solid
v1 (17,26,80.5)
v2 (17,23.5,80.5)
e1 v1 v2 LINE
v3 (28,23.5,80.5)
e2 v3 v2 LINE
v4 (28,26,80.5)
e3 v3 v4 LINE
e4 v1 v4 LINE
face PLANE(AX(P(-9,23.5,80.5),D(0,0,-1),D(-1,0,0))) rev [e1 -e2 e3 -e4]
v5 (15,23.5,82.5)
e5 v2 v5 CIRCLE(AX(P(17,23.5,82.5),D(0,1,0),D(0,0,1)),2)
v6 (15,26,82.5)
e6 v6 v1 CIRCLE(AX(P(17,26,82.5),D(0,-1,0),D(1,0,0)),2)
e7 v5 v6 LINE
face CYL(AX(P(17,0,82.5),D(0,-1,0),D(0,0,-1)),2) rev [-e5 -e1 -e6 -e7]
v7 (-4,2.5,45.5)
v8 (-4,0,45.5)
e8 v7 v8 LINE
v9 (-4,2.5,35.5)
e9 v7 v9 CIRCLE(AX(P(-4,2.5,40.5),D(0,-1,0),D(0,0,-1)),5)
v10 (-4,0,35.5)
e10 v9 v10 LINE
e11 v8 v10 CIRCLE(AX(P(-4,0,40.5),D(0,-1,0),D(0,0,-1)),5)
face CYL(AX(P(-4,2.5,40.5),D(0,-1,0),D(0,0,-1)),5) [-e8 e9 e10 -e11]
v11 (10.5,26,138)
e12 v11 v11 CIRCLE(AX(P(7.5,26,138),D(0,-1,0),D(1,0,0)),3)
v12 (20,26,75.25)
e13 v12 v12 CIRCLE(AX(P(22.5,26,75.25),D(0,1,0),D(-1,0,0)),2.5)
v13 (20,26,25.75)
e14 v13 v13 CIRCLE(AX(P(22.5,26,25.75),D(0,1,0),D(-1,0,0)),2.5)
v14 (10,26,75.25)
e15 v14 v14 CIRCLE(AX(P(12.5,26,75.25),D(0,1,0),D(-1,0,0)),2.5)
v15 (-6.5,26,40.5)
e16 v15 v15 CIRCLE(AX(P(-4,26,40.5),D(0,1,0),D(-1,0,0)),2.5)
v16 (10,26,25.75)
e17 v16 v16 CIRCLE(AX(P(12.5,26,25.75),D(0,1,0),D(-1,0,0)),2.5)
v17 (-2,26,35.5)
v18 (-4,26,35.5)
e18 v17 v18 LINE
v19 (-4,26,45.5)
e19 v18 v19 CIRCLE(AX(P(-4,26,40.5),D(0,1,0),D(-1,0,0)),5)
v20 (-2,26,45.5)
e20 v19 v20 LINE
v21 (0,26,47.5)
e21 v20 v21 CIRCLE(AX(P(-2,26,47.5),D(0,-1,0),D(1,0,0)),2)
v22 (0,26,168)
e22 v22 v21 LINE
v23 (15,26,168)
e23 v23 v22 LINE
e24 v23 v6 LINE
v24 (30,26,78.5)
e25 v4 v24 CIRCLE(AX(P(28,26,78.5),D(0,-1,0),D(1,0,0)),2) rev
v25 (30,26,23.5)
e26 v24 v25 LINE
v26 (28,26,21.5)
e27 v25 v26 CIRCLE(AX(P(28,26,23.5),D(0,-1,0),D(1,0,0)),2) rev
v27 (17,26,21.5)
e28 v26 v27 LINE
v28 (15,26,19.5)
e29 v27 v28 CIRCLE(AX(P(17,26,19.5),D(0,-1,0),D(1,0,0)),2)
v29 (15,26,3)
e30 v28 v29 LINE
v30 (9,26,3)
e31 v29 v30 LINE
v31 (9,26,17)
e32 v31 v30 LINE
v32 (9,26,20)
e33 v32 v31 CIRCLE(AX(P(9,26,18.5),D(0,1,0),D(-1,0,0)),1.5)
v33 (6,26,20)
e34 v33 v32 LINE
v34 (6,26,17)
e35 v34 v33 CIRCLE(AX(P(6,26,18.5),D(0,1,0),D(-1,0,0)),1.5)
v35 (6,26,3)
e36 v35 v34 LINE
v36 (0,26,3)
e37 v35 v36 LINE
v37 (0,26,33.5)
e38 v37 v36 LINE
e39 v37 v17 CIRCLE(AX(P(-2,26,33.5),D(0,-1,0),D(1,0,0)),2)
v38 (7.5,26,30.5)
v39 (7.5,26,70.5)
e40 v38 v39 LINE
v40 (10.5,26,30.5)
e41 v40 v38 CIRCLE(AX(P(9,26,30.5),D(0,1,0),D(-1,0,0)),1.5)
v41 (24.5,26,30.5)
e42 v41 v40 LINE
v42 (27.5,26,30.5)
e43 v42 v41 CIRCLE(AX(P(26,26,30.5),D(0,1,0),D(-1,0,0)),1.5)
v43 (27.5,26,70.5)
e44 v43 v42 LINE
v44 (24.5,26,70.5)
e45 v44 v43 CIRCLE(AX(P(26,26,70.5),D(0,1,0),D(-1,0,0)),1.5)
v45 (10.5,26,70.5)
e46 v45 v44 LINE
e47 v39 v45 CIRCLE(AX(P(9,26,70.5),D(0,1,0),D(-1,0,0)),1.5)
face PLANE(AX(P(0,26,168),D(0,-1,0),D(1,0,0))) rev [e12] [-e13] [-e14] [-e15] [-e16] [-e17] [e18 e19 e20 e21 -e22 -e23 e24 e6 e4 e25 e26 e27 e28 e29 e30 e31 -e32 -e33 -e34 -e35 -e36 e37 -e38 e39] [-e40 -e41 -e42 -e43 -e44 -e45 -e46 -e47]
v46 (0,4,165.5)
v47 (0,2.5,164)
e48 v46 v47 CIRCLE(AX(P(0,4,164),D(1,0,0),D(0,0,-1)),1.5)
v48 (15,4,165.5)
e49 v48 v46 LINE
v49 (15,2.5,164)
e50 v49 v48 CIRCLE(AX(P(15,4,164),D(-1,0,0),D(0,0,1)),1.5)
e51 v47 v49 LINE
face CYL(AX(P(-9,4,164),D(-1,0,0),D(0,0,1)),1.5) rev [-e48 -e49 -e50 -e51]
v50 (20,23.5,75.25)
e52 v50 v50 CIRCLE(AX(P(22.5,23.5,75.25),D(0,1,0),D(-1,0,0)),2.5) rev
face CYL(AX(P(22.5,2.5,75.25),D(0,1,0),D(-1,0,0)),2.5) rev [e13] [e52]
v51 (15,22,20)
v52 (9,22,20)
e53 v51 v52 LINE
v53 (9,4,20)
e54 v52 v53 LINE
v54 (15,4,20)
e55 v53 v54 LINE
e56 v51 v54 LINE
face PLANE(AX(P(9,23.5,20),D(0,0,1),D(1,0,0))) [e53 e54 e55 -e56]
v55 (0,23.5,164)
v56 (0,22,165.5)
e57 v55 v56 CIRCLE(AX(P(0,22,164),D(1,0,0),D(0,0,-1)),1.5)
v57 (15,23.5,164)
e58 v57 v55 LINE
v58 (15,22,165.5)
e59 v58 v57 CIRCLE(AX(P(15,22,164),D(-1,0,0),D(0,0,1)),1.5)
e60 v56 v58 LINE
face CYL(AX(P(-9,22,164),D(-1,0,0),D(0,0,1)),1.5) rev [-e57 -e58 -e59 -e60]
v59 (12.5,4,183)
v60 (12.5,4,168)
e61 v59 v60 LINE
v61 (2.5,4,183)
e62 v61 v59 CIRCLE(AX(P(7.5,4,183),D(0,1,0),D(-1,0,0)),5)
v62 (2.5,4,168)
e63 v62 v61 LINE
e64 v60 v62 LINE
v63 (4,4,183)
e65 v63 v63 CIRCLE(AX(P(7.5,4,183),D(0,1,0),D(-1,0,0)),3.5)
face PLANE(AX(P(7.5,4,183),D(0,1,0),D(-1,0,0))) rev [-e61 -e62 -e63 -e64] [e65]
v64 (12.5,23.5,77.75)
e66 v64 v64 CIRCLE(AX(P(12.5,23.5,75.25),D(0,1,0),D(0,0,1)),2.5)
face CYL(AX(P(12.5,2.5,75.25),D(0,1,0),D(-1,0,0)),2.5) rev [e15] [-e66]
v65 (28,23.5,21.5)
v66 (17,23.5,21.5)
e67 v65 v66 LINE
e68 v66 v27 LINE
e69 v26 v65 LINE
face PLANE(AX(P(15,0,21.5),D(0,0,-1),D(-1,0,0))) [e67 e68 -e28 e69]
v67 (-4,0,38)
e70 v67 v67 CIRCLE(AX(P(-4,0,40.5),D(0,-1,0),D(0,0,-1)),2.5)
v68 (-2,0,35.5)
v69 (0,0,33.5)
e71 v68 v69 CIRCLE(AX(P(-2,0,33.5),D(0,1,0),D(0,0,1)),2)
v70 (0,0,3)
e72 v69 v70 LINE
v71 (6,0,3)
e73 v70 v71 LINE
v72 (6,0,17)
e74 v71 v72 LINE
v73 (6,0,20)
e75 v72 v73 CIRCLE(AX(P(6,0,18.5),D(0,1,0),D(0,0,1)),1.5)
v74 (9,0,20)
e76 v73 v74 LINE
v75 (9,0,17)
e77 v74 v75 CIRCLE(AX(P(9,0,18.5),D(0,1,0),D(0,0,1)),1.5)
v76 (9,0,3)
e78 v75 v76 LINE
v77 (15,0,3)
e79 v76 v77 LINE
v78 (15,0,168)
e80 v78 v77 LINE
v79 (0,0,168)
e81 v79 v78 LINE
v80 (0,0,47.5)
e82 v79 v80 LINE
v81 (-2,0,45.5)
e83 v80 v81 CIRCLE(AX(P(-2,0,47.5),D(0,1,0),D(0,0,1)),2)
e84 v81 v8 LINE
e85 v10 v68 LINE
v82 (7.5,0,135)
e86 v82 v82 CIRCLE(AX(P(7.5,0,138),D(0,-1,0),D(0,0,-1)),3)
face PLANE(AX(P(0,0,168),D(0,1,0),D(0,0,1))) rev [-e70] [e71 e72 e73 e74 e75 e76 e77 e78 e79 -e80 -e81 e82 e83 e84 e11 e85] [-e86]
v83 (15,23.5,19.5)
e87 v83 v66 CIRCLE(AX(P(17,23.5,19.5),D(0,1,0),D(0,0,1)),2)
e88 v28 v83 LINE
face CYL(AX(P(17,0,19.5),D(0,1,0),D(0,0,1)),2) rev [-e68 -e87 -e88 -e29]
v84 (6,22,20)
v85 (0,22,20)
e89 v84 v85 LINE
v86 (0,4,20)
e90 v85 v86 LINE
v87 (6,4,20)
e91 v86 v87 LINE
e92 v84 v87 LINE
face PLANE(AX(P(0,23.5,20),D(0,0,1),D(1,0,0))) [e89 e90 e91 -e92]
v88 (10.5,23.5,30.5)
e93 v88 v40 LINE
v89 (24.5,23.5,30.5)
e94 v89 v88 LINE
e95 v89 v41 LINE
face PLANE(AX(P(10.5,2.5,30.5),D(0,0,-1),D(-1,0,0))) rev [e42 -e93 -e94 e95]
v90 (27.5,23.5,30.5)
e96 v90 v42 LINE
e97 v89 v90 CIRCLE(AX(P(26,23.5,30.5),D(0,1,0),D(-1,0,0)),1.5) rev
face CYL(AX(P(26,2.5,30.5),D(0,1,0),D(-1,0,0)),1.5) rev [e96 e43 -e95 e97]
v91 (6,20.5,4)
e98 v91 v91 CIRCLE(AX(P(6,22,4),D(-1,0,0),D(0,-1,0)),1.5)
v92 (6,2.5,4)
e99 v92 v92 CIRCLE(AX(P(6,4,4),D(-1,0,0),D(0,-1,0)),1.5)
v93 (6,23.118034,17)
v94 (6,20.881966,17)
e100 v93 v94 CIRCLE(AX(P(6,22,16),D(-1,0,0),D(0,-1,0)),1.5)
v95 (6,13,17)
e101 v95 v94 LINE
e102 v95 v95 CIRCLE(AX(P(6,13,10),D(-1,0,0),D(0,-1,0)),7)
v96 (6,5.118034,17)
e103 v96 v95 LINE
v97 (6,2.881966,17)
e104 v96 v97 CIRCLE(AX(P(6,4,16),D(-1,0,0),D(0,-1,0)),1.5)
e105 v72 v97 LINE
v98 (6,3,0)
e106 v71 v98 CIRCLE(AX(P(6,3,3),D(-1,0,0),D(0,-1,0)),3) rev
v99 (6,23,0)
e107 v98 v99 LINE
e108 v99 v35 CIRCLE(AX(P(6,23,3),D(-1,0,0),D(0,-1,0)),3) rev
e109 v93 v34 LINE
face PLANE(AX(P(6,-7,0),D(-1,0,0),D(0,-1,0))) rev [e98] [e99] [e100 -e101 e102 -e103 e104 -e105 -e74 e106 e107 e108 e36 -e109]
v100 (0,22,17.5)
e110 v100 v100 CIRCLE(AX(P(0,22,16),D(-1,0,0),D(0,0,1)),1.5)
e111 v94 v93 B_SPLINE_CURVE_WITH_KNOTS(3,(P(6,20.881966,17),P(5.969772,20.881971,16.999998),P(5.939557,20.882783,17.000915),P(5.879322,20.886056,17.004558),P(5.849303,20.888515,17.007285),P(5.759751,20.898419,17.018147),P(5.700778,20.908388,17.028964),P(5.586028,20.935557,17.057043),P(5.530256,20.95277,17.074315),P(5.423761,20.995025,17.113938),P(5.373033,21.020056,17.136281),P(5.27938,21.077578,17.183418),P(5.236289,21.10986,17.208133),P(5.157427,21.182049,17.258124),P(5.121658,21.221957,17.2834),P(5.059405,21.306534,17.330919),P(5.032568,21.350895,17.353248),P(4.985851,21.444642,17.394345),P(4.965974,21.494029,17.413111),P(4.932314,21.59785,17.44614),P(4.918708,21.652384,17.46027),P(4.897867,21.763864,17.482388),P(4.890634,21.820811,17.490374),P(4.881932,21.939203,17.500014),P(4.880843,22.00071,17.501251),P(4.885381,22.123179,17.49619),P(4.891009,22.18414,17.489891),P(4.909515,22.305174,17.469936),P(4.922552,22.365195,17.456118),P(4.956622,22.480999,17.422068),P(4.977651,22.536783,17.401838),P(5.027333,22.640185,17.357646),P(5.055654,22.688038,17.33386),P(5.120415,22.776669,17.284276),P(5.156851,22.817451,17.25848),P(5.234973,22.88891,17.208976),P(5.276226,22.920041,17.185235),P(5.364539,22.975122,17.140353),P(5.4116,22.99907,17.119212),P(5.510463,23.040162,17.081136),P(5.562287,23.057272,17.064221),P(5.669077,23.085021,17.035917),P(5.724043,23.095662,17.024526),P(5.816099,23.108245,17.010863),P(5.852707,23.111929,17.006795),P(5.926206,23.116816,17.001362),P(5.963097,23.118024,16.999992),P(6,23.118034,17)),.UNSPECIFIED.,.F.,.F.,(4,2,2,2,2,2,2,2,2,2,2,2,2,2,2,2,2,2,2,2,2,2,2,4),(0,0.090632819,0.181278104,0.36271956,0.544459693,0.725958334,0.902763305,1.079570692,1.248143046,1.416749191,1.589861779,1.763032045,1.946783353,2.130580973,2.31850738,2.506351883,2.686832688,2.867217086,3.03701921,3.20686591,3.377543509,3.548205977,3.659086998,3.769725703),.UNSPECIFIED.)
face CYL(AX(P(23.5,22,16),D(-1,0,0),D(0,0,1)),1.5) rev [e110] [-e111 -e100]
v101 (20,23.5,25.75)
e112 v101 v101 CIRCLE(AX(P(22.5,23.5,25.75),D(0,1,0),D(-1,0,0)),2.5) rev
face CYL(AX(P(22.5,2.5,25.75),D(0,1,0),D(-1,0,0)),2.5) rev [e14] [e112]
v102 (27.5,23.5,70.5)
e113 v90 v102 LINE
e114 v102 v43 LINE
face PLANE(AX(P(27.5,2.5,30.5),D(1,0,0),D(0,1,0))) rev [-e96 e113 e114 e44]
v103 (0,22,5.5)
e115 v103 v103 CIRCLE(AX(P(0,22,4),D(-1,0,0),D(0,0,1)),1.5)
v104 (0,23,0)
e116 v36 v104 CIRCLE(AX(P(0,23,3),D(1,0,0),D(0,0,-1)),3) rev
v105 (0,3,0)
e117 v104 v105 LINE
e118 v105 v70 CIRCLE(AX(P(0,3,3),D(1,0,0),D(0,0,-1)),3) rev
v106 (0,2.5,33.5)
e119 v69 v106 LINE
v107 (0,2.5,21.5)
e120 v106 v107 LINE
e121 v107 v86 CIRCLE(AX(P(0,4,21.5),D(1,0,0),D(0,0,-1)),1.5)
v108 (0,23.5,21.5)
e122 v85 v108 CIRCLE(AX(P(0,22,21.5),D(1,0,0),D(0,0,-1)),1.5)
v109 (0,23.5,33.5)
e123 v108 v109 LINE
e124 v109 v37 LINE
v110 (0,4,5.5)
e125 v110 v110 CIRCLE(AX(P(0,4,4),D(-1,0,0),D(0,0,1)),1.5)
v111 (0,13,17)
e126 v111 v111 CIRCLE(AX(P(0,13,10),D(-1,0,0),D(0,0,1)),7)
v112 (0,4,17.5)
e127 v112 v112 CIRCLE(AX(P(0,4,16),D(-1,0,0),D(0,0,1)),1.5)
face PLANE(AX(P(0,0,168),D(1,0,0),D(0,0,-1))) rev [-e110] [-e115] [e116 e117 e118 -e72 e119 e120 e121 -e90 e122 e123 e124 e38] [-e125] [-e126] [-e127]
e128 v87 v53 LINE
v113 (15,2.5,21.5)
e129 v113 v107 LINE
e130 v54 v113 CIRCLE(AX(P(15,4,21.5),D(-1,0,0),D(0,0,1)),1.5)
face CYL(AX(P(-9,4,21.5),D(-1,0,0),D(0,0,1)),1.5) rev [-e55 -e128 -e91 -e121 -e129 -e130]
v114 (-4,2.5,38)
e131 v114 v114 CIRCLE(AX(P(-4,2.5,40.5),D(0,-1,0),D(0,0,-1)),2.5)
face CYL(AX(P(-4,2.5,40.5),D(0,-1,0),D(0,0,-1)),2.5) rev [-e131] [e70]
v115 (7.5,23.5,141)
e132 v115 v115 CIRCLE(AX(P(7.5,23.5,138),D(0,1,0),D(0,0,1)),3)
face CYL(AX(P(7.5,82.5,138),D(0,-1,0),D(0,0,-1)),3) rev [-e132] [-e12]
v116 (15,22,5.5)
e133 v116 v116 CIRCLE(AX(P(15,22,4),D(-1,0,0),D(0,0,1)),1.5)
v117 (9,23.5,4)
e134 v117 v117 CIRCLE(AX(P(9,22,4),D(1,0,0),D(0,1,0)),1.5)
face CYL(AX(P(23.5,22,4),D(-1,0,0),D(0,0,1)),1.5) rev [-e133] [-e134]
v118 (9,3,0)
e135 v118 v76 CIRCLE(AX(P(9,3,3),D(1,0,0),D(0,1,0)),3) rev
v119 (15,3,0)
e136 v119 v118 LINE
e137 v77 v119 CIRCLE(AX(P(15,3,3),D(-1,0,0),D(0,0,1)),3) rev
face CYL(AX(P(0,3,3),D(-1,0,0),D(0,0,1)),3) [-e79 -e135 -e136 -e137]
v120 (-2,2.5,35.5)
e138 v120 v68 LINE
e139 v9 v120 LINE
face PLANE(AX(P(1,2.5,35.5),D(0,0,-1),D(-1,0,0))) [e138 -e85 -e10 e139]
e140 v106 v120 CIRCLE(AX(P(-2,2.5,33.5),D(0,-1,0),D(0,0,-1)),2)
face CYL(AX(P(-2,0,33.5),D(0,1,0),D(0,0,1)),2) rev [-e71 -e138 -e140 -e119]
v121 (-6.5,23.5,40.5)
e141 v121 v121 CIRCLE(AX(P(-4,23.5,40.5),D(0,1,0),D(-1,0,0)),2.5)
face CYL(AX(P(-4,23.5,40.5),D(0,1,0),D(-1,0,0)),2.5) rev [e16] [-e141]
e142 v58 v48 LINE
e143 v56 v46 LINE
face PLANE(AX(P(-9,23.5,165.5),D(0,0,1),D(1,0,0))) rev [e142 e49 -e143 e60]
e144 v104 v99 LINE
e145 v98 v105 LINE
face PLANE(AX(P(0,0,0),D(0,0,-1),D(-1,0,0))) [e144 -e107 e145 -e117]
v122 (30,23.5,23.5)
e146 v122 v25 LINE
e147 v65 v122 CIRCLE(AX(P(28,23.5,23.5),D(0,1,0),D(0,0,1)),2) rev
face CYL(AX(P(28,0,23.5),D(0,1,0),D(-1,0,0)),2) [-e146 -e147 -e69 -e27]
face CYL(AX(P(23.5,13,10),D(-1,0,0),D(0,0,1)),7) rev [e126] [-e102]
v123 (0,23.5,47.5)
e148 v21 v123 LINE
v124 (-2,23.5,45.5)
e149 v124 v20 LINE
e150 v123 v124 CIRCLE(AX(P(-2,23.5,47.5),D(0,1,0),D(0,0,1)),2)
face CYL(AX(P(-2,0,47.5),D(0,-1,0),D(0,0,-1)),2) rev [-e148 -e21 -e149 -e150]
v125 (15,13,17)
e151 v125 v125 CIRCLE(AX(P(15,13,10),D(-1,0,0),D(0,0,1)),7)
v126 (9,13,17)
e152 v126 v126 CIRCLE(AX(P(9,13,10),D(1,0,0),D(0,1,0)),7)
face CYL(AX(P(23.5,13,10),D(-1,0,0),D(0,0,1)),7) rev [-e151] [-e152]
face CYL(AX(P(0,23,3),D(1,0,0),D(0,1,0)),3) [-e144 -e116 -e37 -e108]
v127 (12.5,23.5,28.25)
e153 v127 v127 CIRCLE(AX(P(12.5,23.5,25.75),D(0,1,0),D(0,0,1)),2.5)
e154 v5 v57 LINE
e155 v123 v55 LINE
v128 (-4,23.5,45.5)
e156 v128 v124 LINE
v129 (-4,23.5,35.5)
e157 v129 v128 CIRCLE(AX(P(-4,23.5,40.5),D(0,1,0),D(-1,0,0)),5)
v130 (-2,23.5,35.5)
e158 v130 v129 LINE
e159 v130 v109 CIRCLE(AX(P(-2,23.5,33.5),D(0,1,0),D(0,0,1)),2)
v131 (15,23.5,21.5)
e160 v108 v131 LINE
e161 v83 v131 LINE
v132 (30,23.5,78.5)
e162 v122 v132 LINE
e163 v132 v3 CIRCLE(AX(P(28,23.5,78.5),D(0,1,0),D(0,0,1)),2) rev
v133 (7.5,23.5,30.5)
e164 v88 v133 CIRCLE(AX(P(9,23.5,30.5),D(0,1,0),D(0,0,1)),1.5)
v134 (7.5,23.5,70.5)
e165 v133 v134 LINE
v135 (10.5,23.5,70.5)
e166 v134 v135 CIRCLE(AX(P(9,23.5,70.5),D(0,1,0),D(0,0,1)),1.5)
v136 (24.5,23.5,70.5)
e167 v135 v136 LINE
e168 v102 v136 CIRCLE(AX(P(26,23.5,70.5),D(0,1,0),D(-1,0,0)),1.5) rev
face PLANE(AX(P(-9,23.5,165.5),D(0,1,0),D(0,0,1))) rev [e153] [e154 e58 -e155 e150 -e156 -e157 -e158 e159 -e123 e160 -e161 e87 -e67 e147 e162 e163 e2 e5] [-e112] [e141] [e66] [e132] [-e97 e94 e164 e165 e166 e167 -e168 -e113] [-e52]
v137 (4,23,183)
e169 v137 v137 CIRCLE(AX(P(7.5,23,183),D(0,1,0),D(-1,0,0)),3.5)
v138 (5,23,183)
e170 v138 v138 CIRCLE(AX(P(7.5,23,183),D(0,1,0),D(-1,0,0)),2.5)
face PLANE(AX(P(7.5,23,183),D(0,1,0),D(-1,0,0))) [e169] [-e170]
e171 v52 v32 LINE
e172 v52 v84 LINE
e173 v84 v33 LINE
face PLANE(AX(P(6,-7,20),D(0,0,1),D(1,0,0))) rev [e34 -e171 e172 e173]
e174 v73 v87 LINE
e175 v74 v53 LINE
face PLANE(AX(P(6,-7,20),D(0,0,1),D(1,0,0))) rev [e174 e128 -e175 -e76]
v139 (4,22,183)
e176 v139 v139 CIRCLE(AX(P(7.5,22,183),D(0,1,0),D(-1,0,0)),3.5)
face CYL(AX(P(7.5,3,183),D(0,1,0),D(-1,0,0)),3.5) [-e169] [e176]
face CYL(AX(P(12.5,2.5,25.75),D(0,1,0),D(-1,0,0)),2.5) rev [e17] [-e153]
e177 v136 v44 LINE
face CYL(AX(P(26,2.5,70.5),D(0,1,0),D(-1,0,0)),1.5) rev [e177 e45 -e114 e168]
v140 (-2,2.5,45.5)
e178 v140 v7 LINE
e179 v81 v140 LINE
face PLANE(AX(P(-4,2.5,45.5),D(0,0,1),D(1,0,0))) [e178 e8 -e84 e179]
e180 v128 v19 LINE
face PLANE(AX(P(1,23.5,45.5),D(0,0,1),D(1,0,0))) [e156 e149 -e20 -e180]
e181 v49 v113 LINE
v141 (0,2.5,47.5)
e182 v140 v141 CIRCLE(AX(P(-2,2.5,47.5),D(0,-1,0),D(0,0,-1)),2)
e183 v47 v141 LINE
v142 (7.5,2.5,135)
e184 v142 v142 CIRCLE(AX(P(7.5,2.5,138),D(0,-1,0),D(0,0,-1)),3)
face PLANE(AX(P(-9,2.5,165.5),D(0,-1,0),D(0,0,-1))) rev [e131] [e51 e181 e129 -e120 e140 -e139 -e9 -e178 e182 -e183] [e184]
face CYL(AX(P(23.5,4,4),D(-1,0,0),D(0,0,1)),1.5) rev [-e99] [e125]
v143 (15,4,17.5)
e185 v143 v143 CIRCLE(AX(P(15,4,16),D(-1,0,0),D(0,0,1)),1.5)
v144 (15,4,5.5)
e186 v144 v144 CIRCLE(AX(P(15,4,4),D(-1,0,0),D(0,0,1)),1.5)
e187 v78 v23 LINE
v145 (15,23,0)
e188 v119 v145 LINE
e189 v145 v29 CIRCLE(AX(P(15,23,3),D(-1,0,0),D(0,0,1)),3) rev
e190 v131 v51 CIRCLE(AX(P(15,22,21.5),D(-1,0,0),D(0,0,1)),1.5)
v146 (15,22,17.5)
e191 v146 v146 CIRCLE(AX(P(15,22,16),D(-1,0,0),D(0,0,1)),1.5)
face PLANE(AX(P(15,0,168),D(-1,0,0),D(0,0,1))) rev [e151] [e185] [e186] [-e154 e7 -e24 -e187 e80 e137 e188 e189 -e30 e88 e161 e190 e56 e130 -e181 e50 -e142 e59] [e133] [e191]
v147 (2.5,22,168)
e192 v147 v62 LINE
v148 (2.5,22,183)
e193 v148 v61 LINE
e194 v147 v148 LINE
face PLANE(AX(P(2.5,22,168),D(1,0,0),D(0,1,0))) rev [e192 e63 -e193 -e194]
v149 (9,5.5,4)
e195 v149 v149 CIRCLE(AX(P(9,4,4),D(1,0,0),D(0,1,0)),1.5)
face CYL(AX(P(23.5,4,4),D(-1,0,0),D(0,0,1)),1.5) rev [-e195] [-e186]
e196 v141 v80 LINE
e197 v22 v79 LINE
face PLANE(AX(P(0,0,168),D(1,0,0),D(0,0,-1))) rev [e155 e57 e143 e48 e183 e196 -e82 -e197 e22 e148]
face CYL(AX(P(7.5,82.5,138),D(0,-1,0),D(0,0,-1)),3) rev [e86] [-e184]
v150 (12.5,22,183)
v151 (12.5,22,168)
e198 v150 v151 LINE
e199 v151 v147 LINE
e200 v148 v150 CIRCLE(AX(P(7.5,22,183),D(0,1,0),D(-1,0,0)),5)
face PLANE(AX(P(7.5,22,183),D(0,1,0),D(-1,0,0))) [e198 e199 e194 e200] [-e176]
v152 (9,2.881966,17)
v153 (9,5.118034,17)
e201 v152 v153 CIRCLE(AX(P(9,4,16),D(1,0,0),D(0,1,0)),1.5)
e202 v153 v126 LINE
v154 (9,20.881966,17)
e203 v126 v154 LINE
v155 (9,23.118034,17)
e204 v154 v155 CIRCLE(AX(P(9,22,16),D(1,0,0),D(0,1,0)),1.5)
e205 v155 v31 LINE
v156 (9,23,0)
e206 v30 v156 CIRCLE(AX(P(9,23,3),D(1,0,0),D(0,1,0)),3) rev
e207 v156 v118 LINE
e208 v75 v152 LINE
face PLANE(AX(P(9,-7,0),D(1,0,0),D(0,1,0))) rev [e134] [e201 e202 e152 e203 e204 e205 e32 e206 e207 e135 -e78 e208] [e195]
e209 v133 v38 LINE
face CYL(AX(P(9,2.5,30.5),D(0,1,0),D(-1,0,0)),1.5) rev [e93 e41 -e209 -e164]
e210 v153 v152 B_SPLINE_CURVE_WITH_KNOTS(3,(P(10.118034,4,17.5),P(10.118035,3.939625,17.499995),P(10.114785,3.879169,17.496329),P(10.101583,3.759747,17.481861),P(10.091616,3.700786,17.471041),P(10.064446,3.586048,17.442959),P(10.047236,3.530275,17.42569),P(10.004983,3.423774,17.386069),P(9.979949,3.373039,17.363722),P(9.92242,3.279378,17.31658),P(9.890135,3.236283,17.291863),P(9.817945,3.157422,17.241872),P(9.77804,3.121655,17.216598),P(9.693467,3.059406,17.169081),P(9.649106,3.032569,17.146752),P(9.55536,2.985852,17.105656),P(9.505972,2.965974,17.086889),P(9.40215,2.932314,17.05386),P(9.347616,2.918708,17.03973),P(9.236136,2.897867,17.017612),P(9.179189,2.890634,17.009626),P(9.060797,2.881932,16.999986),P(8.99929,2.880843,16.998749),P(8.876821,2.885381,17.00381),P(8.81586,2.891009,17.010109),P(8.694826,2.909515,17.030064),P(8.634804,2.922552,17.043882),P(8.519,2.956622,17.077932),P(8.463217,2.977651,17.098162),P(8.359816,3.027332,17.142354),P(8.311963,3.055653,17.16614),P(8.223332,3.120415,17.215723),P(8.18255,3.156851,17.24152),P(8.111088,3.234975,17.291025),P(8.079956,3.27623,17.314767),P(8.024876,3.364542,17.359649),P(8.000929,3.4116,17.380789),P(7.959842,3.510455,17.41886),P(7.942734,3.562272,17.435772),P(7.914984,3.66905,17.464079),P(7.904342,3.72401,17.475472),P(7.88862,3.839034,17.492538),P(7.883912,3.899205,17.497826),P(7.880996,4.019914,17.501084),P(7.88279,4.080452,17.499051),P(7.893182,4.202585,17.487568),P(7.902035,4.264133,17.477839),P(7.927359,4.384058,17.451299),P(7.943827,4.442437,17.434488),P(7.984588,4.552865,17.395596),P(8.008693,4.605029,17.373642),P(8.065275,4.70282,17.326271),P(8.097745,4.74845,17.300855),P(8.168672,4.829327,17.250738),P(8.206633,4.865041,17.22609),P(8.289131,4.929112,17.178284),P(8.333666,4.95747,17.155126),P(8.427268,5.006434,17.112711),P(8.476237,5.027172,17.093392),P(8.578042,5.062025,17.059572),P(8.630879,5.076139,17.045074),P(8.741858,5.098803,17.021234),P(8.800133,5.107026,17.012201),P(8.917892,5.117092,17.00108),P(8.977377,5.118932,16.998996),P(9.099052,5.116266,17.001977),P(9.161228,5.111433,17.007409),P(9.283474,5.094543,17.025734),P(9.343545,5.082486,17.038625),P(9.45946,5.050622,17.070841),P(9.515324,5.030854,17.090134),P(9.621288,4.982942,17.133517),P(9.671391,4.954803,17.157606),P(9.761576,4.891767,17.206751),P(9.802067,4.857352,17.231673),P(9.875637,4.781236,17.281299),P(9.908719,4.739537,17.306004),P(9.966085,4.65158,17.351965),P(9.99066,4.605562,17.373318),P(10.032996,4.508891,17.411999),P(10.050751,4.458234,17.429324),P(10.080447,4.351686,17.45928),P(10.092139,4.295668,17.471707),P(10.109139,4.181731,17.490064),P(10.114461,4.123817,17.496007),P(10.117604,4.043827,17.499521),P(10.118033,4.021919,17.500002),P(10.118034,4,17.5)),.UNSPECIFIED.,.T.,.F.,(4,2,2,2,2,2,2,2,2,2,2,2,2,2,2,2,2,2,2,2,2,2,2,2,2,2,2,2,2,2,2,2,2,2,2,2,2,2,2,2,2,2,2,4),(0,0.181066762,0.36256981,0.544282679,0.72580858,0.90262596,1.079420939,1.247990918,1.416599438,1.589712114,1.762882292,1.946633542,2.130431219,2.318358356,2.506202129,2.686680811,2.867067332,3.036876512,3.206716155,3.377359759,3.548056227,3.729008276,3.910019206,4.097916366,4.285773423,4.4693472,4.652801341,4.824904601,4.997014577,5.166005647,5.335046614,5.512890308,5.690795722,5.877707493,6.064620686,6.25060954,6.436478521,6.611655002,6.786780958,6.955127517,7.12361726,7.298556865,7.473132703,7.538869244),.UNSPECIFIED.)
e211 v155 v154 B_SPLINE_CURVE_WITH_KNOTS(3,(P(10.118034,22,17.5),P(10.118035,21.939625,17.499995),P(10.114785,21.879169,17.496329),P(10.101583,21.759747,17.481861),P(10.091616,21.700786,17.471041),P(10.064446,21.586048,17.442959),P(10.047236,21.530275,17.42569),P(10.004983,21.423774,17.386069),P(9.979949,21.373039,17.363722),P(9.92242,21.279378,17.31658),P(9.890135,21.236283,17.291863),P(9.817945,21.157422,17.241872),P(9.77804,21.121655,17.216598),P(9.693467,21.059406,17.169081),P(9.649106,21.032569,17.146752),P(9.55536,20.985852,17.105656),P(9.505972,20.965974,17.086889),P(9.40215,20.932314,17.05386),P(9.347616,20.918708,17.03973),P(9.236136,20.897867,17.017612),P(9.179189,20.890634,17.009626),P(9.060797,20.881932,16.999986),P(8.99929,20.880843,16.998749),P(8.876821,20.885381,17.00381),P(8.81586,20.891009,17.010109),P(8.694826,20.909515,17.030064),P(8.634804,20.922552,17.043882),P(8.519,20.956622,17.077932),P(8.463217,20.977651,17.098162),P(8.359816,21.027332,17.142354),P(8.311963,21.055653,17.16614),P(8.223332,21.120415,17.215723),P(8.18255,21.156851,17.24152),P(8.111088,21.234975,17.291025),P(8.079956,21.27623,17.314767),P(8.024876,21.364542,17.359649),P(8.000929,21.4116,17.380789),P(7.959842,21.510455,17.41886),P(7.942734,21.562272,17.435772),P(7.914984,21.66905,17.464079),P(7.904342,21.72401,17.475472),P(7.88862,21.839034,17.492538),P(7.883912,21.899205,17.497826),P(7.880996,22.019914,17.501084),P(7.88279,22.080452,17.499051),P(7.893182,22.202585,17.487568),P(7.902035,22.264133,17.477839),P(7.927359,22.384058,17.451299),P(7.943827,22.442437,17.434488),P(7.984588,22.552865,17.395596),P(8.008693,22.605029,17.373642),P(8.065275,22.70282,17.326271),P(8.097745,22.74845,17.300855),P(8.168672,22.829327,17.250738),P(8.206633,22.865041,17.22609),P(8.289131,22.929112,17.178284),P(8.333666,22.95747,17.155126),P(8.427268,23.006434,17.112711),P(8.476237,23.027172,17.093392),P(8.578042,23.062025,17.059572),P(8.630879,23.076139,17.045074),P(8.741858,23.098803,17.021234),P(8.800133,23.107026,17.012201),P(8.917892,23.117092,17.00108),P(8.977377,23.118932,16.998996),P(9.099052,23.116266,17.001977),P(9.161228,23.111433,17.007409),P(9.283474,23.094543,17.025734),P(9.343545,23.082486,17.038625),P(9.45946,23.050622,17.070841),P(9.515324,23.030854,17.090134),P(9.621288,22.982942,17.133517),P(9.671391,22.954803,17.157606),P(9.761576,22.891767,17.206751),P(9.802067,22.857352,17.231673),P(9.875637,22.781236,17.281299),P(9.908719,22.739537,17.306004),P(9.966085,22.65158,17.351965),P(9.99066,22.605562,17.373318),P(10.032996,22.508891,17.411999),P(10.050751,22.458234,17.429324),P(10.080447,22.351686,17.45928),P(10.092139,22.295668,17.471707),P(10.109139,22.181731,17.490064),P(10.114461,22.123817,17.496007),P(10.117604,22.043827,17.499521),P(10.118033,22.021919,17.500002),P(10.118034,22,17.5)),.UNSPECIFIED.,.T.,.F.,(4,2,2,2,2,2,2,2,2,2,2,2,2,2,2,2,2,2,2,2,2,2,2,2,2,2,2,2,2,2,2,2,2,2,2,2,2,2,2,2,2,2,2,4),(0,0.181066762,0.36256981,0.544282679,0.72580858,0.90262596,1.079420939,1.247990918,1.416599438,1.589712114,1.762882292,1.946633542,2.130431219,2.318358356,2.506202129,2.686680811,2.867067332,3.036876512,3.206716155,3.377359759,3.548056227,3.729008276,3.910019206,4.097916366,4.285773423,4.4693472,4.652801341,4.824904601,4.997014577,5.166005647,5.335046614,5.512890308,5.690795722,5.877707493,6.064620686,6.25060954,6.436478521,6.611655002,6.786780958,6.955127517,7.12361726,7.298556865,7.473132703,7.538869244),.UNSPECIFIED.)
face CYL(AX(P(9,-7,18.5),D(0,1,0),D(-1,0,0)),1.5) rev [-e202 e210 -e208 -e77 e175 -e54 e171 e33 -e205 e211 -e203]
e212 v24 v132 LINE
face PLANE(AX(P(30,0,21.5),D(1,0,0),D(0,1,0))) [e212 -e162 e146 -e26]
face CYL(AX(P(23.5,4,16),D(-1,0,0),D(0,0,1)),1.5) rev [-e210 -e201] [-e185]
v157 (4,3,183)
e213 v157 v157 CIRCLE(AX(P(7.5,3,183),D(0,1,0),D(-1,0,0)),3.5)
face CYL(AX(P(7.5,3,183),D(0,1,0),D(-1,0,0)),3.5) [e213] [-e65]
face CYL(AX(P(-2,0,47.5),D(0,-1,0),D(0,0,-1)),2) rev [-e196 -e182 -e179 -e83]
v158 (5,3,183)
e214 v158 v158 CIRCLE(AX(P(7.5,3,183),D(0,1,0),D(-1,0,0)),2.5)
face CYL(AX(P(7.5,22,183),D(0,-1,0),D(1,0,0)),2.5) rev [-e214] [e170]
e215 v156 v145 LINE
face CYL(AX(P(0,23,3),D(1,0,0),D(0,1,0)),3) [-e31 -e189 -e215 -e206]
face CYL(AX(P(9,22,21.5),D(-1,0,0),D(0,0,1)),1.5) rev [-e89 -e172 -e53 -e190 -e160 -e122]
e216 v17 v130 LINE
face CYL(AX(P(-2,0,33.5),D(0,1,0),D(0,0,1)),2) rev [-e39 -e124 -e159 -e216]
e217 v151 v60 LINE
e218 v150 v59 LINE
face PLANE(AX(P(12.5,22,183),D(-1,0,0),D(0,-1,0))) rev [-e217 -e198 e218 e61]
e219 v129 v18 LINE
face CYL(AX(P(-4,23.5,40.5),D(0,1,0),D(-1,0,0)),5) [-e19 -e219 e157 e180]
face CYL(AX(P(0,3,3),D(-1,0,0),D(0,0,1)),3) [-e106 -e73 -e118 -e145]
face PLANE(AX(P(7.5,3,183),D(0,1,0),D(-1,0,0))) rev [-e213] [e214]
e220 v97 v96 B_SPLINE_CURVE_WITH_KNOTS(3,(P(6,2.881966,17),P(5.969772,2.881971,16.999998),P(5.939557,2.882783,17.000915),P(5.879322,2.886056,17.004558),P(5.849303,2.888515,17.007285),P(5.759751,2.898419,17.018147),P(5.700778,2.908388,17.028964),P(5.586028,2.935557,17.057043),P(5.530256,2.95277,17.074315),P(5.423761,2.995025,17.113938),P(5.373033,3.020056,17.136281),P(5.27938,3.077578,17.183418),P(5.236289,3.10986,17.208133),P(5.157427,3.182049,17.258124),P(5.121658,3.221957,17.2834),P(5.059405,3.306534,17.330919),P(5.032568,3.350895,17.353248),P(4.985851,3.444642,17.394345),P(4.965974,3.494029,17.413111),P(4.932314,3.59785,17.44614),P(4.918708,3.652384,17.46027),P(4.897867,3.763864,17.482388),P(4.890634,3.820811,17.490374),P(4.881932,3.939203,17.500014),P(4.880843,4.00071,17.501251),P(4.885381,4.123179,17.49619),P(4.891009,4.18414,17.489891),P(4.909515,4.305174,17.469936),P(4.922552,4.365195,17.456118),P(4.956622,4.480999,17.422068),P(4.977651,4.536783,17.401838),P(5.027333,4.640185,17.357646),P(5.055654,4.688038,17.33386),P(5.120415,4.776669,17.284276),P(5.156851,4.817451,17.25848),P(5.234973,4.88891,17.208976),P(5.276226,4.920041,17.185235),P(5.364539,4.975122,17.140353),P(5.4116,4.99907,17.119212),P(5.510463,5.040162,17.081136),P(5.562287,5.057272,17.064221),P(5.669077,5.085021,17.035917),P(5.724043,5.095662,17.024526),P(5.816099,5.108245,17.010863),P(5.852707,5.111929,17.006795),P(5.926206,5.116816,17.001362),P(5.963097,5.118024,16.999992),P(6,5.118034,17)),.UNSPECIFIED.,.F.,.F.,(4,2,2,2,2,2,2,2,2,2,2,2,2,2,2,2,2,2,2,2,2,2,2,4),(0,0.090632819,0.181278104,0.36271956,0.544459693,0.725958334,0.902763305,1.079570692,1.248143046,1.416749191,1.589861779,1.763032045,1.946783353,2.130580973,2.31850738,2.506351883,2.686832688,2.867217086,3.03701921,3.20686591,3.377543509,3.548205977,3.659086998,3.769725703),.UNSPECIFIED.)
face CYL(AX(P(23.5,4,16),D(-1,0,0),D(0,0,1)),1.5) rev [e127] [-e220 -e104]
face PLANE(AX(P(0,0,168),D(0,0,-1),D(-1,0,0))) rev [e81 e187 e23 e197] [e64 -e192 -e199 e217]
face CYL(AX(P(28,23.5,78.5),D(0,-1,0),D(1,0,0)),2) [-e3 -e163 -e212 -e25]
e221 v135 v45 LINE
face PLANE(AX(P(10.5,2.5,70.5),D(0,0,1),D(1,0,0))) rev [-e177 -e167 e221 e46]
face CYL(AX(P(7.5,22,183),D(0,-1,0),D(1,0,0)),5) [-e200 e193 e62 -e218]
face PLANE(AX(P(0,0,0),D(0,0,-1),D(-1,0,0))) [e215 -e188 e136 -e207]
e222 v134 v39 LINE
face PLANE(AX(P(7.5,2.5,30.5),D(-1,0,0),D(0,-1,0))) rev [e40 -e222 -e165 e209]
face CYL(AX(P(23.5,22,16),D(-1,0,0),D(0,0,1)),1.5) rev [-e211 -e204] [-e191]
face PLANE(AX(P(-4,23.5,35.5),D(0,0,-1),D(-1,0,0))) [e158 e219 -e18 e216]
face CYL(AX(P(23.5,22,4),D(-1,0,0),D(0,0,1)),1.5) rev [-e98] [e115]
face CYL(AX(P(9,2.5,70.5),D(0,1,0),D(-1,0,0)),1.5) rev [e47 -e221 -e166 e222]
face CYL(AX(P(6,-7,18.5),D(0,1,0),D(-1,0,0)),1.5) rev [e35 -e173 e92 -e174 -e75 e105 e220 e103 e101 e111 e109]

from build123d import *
from build123d.topology import SkipClean

# Parameters (mm, degrees)
SKETCH_1_W           = 15
SKETCH_1_H           = 26
EXTRUDE_1_DEPTH      = 168
SKETCH_2_R           = 2.5
EXTRUDE_2_DEPTH      = 9
EXTRUDE_3_DEPTH      = 1
EXTRUDE_3_DEPTH_BACK = 19
SKETCH_3_R           = 3.5
SKETCH_3_R_2         = 2.5
SKETCH_4_W           = 85
SKETCH_4_H           = 21
CUT_EXTRUDE_1_DEPTH  = 24
CUT_EXTRUDE_2_DEPTH  = 33
SKETCH_6_W           = 78
SKETCH_6_H           = 21
CUT_EXTRUDE_3_DEPTH  = 33
SKETCH_7_W           = 15
SKETCH_7_H           = 59
EXTRUDE_4_DEPTH      = 26
SKETCH_8_R           = 2.5
CUT_EXTRUDE_4_DEPTH  = 23.5
SKETCH_9_R           = 2.5
EXTRUDE_5_DEPTH      = 2.5
EXTRUDE_START        = -2.5
SKETCH_10_R          = 2.5
EXTRUDE_6_DEPTH      = 2.5
SKETCH_11_R          = 3
CUT_EXTRUDE_5_DEPTH  = 82.5
SKETCH_12_W          = 56.5
SKETCH_12_H          = 21
CUT_EXTRUDE_6_DEPTH  = 82.5
SKETCH_13_W          = 15
SKETCH_13_H          = 59
CUT_EXTRUDE_7_DEPTH  = 23.5
SKETCH_14_W          = 15
SKETCH_14_H          = 21
CUT_EXTRUDE_8_DEPTH  = 23.5
EXTRUDE_START_2      = -23.5
EXTRUDE_7_DEPTH      = 23.5
FILLET_1_R           = 2
SKETCH_16_R          = 1.5
SKETCH_16_R_2        = 7
CUT_EXTRUDE_9_DEPTH  = 23.5
FILLET_2_R           = 1.5
FILLET_3_R           = 3


with BuildPart() as part:
    # 草图1 → 凸台-拉伸1 (new body)
    with BuildSketch(Plane.XY):
        with Locations((7.5, 13)):
            Rectangle(SKETCH_1_W, SKETCH_1_H)
    extrude(amount=EXTRUDE_1_DEPTH)

    # 草图2 → 凸台-拉伸2 (add, symmetric)
    with BuildSketch(Plane(origin=(0, 13, 0), x_dir=(1, 0, 0), z_dir=(0, 1, 0))):
        with BuildLine():
            Line((12.5, -183), (12.5, -168))
            Line((12.5, -168), (2.5, -168))
            Line((2.5, -168), (2.5, -183))
            ThreePointArc((2.5, -183), (7.5, -188), (12.5, -183))
        make_face()
        with Locations(Location((7.5, -183, 0), (0, 0, 180))):
            Circle(SKETCH_2_R, mode=Mode.SUBTRACT)
    extrude(amount=EXTRUDE_2_DEPTH, both=True)

    # 草图3 → 凸台-拉伸3 (add, two sides: drawn at the far end of the back side and taken through both)
    with BuildSketch(Plane(origin=(0, 22, 0), x_dir=(1, 0, 0), z_dir=(0, 1, 0)).offset(-EXTRUDE_3_DEPTH_BACK)):
        with Locations(Location((7.5, -183, 0), (0, 0, 180))):
            Circle(SKETCH_3_R)
        with Locations(Location((7.5, -183, 0), (0, 0, 180))):
            Circle(SKETCH_3_R_2, mode=Mode.SUBTRACT)
    extrude(amount=EXTRUDE_3_DEPTH + EXTRUDE_3_DEPTH_BACK)

    # 草图4 → 切除-拉伸1 (cut)
    with BuildSketch(Plane(origin=(15, 0, 0), x_dir=(0, 0, -1), z_dir=(1, 0, 0))):
        with Locations((-123, 13)):
            Rectangle(SKETCH_4_W, SKETCH_4_H)
    extrude(amount=-CUT_EXTRUDE_1_DEPTH, mode=Mode.SUBTRACT)

    # 草图5 → 切除-拉伸2 (cut)
    with BuildSketch(Plane(origin=(0, 26, 0), x_dir=(1, 0, 0), z_dir=(0, 1, 0))):
        with BuildLine():
            Line((6, 0), (9, 0))
            Line((9, 0), (9, -17))
            ThreePointArc((9, -17), (10.5, -18.5), (9, -20))
            Line((9, -20), (6, -20))
            ThreePointArc((6, -20), (4.5, -18.5), (6, -17))
            Line((6, -17), (6, 0))
        make_face()
    extrude(amount=-CUT_EXTRUDE_2_DEPTH, mode=Mode.SUBTRACT)

    # 草图6 → 切除-拉伸3 (cut)
    with BuildSketch(Plane(origin=(15, 0, 0), x_dir=(0, 0, -1), z_dir=(1, 0, 0))):
        with Locations((-39, 13)):
            Rectangle(SKETCH_6_W, SKETCH_6_H)
    extrude(amount=-CUT_EXTRUDE_3_DEPTH, mode=Mode.SUBTRACT)

    # 草图7 → 凸台-拉伸4 (add)
    with BuildSketch(Plane(origin=(0, 26, 0), x_dir=(1, 0, 0), z_dir=(0, 1, 0))):
        with Locations((22.5, -51)):
            Rectangle(SKETCH_7_W, SKETCH_7_H)
    extrude(amount=-EXTRUDE_4_DEPTH)

    # 草图8 → 切除-拉伸4 (cut)
    with BuildSketch(Plane(origin=(0, 26, 0), x_dir=(1, 0, 0), z_dir=(0, 1, 0))):
        with Locations(Location((12.5, -25.75, 0), (0, 0, 180))):
            Circle(SKETCH_8_R)
        with Locations(Location((22.5, -25.75, 0), (0, 0, 180))):
            Circle(SKETCH_8_R)
        with Locations(Location((12.5, -75.25, 0), (0, 0, 180))):
            Circle(SKETCH_8_R)
        with Locations(Location((22.5, -75.25, 0), (0, 0, 180))):
            Circle(SKETCH_8_R)
        with BuildLine():
            Line((10.5, -30.5), (24.5, -30.5))
            ThreePointArc((24.5, -30.5), (26, -29), (27.5, -30.5))
            Line((27.5, -30.5), (27.5, -70.5))
            ThreePointArc((27.5, -70.5), (26, -72), (24.5, -70.5))
            Line((24.5, -70.5), (10.5, -70.5))
            ThreePointArc((10.5, -70.5), (9, -72), (7.5, -70.5))
            Line((7.5, -70.5), (7.5, -30.5))
            ThreePointArc((7.5, -30.5), (9, -29), (10.5, -30.5))
        make_face()
    extrude(amount=-CUT_EXTRUDE_4_DEPTH, mode=Mode.SUBTRACT)

    # 草图9 → 凸台-拉伸5 (add)
    with SkipClean():  # the faces are left unmerged after this step: merging them gives an invalid solid
        with BuildSketch(Plane(origin=(0, 26, 0), x_dir=(1, 0, 0), z_dir=(0, 1, 0))):
            with BuildLine():
                Line((-4, -35.5), (1, -35.5))
                Line((1, -35.5), (1, -45.5))
                Line((1, -45.5), (-4, -45.5))
                ThreePointArc((-4, -45.5), (-9, -40.5), (-4, -35.5))
            make_face()
            with Locations(Location((-4, -40.5, 0), (0, 0, 180))):
                Circle(SKETCH_9_R, mode=Mode.SUBTRACT)
        extrude(amount=-EXTRUDE_5_DEPTH)

    # 草图10 → 凸台-拉伸6 (add)
    with SkipClean():  # the faces are left unmerged after this step: merging them gives an invalid solid
        with BuildSketch(Plane.XZ.offset(EXTRUDE_START)):
            with BuildLine():
                Line((-4, 45.5), (1, 45.5))
                Line((1, 45.5), (1, 35.5))
                Line((1, 35.5), (-4, 35.5))
                ThreePointArc((-4, 35.5), (-9, 40.5), (-4, 45.5))
            make_face()
            with Locations(Location((-4, 40.5, 0), (0, 0, 180))):
                Circle(SKETCH_10_R, mode=Mode.SUBTRACT)
        extrude(amount=EXTRUDE_6_DEPTH)

    # 草图11 → 切除-拉伸5 (cut)
    with SkipClean():  # the faces are left unmerged after this step: merging them gives an invalid solid
        with BuildSketch(Plane.XZ):
            with Locations(Location((7.5, 138, 0), (0, 0, 270))):
                Circle(SKETCH_11_R)
        extrude(amount=-CUT_EXTRUDE_5_DEPTH, mode=Mode.SUBTRACT)

    # 草图12 → 切除-拉伸6 (cut)
    with BuildSketch(Plane.ZY.offset(-15)):
        with Locations((49.75, 13)):
            Rectangle(SKETCH_12_W, SKETCH_12_H)
    extrude(amount=-CUT_EXTRUDE_6_DEPTH, mode=Mode.SUBTRACT)

    # 草图13 → 切除-拉伸7 (cut)
    with BuildSketch(Plane.XZ):
        with Locations((22.5, 51)):
            Rectangle(SKETCH_13_W, SKETCH_13_H)
    extrude(amount=-CUT_EXTRUDE_7_DEPTH, mode=Mode.SUBTRACT)

    # 草图14 → 切除-拉伸8 (cut)
    with BuildSketch(Plane(origin=(0, 0, 78), x_dir=(-1, 0, 0), z_dir=(0, 0, -1))):
        with Locations((-7.5, 13)):
            Rectangle(SKETCH_14_W, SKETCH_14_H)
    extrude(amount=-CUT_EXTRUDE_8_DEPTH, mode=Mode.SUBTRACT)

    # 草图15 → 凸台-拉伸7 (add)
    with BuildSketch(Plane.XZ.offset(EXTRUDE_START_2)):
        with BuildLine():
            Line((0, 20), (6, 20))
            ThreePointArc((6, 20), (4.5, 18.5), (6, 17))
            Line((6, 17), (6, 0))
            Line((6, 0), (0, 0))
            Line((0, 0), (0, 20))
        make_face()
        with BuildLine():
            Line((9, 20), (15, 20))
            Line((15, 20), (15, 0))
            Line((15, 0), (9, 0))
            Line((9, 0), (9, 17))
            ThreePointArc((9, 17), (10.5, 18.5), (9, 20))
        make_face()
    extrude(amount=EXTRUDE_7_DEPTH)

    # 圆角1
    # the kernel refuses this fillet: 2 mm, written as the material it adds along each edge
    with BuildSketch(Plane(origin=(15, 26, 80.5), x_dir=(1, 0, 0), z_dir=(0, -1, 0)), Plane(origin=(0, 26, 35.5), x_dir=(-1, 0, 0), z_dir=(0, -1, 0)), Plane(origin=(0, 23.5, 45.5), x_dir=(-1, 0, 0), z_dir=(0, 1, 0)), Plane(origin=(0, 2.5, 45.5), x_dir=(0, 0, 1), z_dir=(0, -1, 0))) as fillet_1_piece_1:
        with BuildLine():
            CenterArc((FILLET_1_R, FILLET_1_R), FILLET_1_R, 180, 90)
            Line((0, FILLET_1_R), (0, 0))
            Line((0, 0), (FILLET_1_R, 0))
        make_face()
    extrude(amount=2.5)
    with BuildSketch(Plane(origin=(15, 26, 21.5), x_dir=(1, 0, 0), z_dir=(0, -1, 0)), Plane(origin=(0, 0, 35.5), x_dir=(-1, 0, 0), z_dir=(0, 1, 0))) as fillet_1_piece_2:
        with BuildLine():
            CenterArc((FILLET_1_R, -FILLET_1_R), FILLET_1_R, 90, 90)
            Line((0, -FILLET_1_R), (0, 0))
            Line((0, 0), (FILLET_1_R, 0))
        make_face()
    extrude(amount=2.5)
    # the kernel refuses this fillet: 2 mm, written as the material it takes off along each edge
    with BuildSketch(Plane(origin=(30, 31, 21.5), x_dir=(-1, 0, 0), z_dir=(0, -1, 0)), Plane(origin=(30, 31, 80.5), x_dir=(0, 0, -1), z_dir=(0, -1, 0))) as fillet_1_2_piece_1:
        with BuildLine():
            CenterArc((FILLET_1_R, -FILLET_1_R), FILLET_1_R, 90, 90)
            Line((0, -FILLET_1_R), (0, 0))
            Line((0, 0), (FILLET_1_R, 0))
        make_face()
    extrude(amount=12.5, mode=Mode.SUBTRACT)

    # 草图16 → 切除-拉伸9 (cut)
    with BuildSketch(Plane.ZY):
        with Locations((4, 4)):
            Circle(SKETCH_16_R)
        with Locations((16, 4)):
            Circle(SKETCH_16_R)
        with Locations((4, 22)):
            Circle(SKETCH_16_R)
        with Locations((16, 22)):
            Circle(SKETCH_16_R)
        with Locations((10, 13)):
            Circle(SKETCH_16_R_2)
    extrude(amount=-CUT_EXTRUDE_9_DEPTH, mode=Mode.SUBTRACT)

    # 圆角2
    # the kernel refuses this fillet: 1.5 mm, written as the material it adds along each edge
    with BuildSketch(Plane(origin=(0, 23.5, 20), x_dir=(0, 0, 1), z_dir=(1, 0, 0)), Plane(origin=(5.25, 23.5, 20), x_dir=(0, 0, 1), z_dir=(1, 0, 0))) as fillet_2_piece_1:
        with BuildLine():
            CenterArc((FILLET_2_R, FILLET_2_R), FILLET_2_R, 180, 90)
            Line((0, FILLET_2_R), (0, 0))
            Line((0, 0), (FILLET_2_R, 0))
        make_face()
    extrude(amount=9.75)
    with BuildSketch(Plane(origin=(0, 2.5, 20), x_dir=(0, 0, 1), z_dir=(1, 0, 0)), Plane(origin=(5.25, 2.5, 20), x_dir=(0, 0, 1), z_dir=(1, 0, 0))) as fillet_2_piece_2:
        with BuildLine():
            CenterArc((FILLET_2_R, -FILLET_2_R), FILLET_2_R, 90, 90)
            Line((0, -FILLET_2_R), (0, 0))
            Line((0, 0), (FILLET_2_R, 0))
        make_face()
    extrude(amount=9.75)
    with BuildSketch(Plane(origin=(15, 2.5, 165.5), x_dir=(0, 1, 0), z_dir=(-1, 0, 0)), Plane(origin=(15, 23.5, 165.5), x_dir=(0, 0, -1), z_dir=(-1, 0, 0))) as fillet_2_piece_3:
        with BuildLine():
            CenterArc((FILLET_2_R, FILLET_2_R), FILLET_2_R, 180, 90)
            Line((0, FILLET_2_R), (0, 0))
            Line((0, 0), (FILLET_2_R, 0))
        make_face()
    extrude(amount=15)

    # 圆角3
    fillet_3_edges = [part.edges().sort_by_distance(p)[0] for p in [
        (12, 26, 0),
        (3, 0, 0),
        (3, 26, 0),
        (12, 0, 0),
    ]]
    fillet(fillet_3_edges, radius=FILLET_3_R)


solid = part.part
